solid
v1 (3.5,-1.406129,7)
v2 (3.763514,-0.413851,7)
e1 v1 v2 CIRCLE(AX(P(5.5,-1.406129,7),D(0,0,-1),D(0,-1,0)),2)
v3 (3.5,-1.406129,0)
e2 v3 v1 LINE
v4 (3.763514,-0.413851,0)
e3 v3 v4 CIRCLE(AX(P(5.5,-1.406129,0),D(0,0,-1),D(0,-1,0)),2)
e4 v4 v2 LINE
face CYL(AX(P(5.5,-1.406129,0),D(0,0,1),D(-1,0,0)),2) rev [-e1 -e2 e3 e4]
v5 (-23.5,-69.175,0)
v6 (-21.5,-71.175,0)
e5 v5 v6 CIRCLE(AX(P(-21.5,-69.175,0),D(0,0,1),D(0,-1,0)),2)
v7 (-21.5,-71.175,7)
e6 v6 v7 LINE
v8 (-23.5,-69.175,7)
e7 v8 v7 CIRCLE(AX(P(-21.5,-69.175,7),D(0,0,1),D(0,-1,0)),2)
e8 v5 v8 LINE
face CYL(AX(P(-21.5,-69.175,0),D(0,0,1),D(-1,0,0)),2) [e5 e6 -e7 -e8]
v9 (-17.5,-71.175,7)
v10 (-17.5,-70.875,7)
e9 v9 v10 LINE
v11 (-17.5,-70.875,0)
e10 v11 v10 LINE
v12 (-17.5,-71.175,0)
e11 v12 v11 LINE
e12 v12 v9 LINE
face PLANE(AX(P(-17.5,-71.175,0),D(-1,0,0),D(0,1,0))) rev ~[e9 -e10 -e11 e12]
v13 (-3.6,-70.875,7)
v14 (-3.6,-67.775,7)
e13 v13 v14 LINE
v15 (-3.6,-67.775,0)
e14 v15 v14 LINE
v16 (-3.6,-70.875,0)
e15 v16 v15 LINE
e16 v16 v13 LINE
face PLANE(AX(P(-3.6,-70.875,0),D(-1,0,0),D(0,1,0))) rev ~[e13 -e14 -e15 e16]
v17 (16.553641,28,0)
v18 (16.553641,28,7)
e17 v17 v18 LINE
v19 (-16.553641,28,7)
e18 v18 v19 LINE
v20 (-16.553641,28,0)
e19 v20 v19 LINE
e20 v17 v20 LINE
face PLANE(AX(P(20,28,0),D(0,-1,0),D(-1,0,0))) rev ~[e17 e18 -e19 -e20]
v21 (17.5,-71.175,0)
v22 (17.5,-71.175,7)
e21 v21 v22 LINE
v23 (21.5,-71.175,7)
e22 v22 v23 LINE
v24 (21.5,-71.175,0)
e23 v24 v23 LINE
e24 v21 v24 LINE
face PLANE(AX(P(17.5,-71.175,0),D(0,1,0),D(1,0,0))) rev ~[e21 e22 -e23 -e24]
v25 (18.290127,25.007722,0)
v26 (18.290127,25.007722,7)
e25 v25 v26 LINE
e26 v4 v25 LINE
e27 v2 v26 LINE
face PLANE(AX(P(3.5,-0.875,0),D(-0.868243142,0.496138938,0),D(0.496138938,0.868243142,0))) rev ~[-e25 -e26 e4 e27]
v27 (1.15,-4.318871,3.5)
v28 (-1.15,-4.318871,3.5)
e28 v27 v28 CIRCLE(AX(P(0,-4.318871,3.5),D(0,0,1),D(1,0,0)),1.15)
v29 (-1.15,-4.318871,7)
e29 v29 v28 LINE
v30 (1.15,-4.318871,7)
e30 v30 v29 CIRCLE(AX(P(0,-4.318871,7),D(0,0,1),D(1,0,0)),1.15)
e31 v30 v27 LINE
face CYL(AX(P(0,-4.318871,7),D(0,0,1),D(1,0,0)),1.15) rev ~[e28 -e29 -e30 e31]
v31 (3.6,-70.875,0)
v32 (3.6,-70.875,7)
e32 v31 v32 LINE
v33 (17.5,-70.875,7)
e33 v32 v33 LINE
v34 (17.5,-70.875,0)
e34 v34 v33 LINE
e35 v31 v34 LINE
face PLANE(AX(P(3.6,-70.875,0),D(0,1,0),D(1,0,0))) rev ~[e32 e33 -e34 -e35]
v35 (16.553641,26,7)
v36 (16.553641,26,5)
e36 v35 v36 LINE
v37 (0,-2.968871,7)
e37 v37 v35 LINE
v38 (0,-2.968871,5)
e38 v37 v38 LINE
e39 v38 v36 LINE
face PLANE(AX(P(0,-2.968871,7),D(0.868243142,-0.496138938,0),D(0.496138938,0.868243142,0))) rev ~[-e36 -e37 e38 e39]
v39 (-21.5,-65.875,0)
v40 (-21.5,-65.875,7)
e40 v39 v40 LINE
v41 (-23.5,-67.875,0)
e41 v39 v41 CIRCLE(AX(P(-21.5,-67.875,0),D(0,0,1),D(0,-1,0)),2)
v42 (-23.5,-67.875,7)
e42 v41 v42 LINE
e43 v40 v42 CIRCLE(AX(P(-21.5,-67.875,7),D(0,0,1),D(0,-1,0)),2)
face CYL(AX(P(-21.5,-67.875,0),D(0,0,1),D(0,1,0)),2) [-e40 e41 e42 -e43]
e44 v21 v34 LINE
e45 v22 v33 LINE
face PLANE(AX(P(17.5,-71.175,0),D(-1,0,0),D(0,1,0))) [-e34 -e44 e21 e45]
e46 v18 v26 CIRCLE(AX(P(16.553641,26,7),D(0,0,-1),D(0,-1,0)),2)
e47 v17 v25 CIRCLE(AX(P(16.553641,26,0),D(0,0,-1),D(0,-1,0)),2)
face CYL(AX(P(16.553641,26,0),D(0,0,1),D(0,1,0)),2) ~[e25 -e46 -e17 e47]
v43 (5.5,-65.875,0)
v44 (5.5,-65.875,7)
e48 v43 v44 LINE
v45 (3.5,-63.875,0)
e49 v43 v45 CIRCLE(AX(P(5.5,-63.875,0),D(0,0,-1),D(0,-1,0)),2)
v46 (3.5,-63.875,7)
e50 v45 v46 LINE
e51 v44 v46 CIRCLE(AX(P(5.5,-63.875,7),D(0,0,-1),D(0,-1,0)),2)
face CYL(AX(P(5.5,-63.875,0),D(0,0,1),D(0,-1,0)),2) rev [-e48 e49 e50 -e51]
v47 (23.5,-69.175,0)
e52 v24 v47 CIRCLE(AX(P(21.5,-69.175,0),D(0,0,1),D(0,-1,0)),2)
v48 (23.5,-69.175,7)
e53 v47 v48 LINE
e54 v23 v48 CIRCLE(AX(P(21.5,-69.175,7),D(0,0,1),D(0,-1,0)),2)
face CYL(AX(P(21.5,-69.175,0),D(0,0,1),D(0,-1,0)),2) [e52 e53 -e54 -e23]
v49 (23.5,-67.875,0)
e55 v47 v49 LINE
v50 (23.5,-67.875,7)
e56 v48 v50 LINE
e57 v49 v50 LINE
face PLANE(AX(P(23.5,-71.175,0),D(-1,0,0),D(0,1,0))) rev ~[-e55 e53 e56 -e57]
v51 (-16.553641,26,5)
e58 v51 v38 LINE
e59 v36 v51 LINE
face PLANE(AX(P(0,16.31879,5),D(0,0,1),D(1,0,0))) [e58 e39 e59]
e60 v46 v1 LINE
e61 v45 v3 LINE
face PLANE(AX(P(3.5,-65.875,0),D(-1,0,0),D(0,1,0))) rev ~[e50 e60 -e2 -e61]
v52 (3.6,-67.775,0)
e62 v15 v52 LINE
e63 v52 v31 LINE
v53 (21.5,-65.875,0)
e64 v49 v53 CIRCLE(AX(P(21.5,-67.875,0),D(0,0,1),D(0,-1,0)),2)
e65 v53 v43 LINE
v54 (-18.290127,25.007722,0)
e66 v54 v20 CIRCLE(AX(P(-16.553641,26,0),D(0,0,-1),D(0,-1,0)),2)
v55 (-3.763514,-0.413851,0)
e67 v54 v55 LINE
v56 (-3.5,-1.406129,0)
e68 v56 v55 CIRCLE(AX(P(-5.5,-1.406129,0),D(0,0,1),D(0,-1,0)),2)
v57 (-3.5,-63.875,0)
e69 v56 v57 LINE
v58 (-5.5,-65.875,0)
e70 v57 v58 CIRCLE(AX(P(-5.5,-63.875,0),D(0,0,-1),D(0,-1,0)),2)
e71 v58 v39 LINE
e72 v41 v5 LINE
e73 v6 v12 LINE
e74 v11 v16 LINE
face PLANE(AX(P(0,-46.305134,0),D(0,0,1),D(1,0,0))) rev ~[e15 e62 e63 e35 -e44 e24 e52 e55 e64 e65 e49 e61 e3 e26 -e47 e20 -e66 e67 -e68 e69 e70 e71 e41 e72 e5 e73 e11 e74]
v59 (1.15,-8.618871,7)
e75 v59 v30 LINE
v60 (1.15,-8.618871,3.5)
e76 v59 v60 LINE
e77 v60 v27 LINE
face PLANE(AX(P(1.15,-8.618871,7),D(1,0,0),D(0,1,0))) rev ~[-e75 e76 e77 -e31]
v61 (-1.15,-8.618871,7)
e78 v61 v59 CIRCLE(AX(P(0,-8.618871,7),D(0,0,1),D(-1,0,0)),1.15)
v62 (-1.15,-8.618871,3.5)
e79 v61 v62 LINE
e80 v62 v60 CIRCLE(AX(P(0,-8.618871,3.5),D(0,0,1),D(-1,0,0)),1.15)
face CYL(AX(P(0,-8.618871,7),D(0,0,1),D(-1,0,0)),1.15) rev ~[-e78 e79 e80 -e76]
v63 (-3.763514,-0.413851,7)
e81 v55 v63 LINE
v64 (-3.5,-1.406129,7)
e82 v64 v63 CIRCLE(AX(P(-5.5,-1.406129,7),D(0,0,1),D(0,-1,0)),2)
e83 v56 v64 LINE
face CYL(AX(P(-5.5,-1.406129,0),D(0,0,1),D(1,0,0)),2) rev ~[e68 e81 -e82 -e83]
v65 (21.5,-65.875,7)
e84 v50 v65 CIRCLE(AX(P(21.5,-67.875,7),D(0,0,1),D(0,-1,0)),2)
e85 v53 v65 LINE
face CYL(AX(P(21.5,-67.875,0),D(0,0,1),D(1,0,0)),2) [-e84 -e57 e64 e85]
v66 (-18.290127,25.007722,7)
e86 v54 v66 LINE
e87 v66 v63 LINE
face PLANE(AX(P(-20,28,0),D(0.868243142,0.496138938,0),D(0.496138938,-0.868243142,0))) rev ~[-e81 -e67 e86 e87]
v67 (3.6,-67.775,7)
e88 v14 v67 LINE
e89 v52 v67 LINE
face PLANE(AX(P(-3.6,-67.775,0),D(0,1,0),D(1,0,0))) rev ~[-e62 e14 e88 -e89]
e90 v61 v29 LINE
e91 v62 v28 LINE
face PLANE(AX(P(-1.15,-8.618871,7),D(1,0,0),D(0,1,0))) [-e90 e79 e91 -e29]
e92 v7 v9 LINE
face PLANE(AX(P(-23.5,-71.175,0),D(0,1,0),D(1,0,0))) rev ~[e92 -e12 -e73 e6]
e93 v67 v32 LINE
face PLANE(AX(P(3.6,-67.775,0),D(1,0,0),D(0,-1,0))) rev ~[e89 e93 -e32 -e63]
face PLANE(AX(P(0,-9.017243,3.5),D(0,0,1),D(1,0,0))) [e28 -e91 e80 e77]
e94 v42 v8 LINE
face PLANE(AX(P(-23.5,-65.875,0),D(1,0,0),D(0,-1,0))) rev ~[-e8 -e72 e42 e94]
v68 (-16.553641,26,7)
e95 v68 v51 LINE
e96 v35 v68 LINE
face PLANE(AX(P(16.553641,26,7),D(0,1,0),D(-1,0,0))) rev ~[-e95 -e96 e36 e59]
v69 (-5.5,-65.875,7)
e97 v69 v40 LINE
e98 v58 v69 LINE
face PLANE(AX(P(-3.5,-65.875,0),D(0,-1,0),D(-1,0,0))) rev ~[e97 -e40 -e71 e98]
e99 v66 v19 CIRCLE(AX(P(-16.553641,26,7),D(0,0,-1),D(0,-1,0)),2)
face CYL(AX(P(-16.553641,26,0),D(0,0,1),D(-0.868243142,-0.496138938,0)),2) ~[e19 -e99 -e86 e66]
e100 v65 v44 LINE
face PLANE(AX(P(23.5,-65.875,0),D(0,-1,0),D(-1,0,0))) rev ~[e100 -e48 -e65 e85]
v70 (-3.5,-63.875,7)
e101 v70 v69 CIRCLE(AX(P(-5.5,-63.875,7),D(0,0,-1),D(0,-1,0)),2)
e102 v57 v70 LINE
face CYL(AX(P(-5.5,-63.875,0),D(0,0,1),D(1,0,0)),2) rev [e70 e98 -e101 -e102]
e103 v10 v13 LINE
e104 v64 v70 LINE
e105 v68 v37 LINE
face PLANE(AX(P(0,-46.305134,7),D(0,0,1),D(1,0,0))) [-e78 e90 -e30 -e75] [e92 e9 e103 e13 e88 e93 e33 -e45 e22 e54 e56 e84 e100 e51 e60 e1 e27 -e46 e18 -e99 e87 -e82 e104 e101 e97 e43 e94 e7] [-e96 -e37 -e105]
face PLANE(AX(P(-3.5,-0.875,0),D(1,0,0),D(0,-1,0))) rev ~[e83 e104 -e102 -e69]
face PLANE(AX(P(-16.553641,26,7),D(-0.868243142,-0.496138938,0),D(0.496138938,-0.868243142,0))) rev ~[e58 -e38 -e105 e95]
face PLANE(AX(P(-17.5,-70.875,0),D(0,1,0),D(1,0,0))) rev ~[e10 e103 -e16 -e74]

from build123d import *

# Parameters (mm, degrees)
F0_W     = 6
F0_H     = 0.3
F1_DEPTH = 7
F3_DEPTH = 2
F4_R     = 2
F5_W     = 2.3
F5_H     = 4.3
F6_DEPTH = 3.5


# Not quite as in the source:
# - a feature names something its author has since deleted; it is built from what else it names


with BuildPart() as f1:
    # F0 (on Top) → F1 (new body)
    with BuildSketch(Plane.XY):
        Polygon((0, -7), (-3.5, -0.875), (-3.5, -65.875), (-23.5, -65.875), (-23.5, -70.875), (-17.5, -70.875), (-3.6, -70.875), (-3.6, -67.775), (3.6, -67.775), (3.6, -70.875), (17.5, -70.875), (23.5, -70.875), (23.5, -65.875), (3.5, -65.875), (3.5, -0.875), align=None)
        with Locations((-20.5, -71.025)):
            Rectangle(F0_W, F0_H)
        with Locations((20.5, -71.025)):
            Rectangle(F0_W, F0_H)
        Polygon((-20, 28), (-3.5, -0.875), (0, -7), (3.5, -0.875), (20, 28), align=None)
    extrude(amount=F1_DEPTH)

    # F2 (on face) → F3 (cut)
    with BuildSketch(Plane.XY.offset(7)):
        Polygon((16.5536406433, 26), (-16.5536406433, 26), (0, -2.9688711259), align=None)
    extrude(amount=-F3_DEPTH, mode=Mode.SUBTRACT)

    # F4
    f4_edges = [f1.edges().sort_by_distance(p)[0] for p in [
        (3.5, -65.875, 3.5),
        (-3.5, -65.875, 3.5),
        (-23.5, -65.875, 3.5),
        (23.5, -65.875, 3.5),
        (-23.5, -71.175, 3.5),
        (23.5, -71.175, 3.5),
        (-20, 28, 3.5),
        (20, 28, 3.5),
        (-3.5, -0.875, 3.5),
        (3.5, -0.875, 3.5),
    ]]
    fillet(f4_edges, radius=F4_R)

    # F5 (on face) → F6 (cut)
    with BuildSketch(Plane.XY.offset(7)):
        with BuildLine():
            ThreePointArc((-1.15, -8.6188711259), (0, -9.7688711259), (1.15, -8.6188711259))
            Line((1.15, -8.6188711259), (-1.15, -8.6188711259))
        make_face()
        with Locations((0, -6.4688711259)):
            Rectangle(F5_W, F5_H)
        with BuildLine():
            Line((-1.15, -4.3188711259), (1.15, -4.3188711259))
            ThreePointArc((1.15, -4.3188711259), (0, -3.1688711259), (-1.15, -4.3188711259))
        make_face()
    extrude(amount=-F6_DEPTH, mode=Mode.SUBTRACT)


solid = f1.part
